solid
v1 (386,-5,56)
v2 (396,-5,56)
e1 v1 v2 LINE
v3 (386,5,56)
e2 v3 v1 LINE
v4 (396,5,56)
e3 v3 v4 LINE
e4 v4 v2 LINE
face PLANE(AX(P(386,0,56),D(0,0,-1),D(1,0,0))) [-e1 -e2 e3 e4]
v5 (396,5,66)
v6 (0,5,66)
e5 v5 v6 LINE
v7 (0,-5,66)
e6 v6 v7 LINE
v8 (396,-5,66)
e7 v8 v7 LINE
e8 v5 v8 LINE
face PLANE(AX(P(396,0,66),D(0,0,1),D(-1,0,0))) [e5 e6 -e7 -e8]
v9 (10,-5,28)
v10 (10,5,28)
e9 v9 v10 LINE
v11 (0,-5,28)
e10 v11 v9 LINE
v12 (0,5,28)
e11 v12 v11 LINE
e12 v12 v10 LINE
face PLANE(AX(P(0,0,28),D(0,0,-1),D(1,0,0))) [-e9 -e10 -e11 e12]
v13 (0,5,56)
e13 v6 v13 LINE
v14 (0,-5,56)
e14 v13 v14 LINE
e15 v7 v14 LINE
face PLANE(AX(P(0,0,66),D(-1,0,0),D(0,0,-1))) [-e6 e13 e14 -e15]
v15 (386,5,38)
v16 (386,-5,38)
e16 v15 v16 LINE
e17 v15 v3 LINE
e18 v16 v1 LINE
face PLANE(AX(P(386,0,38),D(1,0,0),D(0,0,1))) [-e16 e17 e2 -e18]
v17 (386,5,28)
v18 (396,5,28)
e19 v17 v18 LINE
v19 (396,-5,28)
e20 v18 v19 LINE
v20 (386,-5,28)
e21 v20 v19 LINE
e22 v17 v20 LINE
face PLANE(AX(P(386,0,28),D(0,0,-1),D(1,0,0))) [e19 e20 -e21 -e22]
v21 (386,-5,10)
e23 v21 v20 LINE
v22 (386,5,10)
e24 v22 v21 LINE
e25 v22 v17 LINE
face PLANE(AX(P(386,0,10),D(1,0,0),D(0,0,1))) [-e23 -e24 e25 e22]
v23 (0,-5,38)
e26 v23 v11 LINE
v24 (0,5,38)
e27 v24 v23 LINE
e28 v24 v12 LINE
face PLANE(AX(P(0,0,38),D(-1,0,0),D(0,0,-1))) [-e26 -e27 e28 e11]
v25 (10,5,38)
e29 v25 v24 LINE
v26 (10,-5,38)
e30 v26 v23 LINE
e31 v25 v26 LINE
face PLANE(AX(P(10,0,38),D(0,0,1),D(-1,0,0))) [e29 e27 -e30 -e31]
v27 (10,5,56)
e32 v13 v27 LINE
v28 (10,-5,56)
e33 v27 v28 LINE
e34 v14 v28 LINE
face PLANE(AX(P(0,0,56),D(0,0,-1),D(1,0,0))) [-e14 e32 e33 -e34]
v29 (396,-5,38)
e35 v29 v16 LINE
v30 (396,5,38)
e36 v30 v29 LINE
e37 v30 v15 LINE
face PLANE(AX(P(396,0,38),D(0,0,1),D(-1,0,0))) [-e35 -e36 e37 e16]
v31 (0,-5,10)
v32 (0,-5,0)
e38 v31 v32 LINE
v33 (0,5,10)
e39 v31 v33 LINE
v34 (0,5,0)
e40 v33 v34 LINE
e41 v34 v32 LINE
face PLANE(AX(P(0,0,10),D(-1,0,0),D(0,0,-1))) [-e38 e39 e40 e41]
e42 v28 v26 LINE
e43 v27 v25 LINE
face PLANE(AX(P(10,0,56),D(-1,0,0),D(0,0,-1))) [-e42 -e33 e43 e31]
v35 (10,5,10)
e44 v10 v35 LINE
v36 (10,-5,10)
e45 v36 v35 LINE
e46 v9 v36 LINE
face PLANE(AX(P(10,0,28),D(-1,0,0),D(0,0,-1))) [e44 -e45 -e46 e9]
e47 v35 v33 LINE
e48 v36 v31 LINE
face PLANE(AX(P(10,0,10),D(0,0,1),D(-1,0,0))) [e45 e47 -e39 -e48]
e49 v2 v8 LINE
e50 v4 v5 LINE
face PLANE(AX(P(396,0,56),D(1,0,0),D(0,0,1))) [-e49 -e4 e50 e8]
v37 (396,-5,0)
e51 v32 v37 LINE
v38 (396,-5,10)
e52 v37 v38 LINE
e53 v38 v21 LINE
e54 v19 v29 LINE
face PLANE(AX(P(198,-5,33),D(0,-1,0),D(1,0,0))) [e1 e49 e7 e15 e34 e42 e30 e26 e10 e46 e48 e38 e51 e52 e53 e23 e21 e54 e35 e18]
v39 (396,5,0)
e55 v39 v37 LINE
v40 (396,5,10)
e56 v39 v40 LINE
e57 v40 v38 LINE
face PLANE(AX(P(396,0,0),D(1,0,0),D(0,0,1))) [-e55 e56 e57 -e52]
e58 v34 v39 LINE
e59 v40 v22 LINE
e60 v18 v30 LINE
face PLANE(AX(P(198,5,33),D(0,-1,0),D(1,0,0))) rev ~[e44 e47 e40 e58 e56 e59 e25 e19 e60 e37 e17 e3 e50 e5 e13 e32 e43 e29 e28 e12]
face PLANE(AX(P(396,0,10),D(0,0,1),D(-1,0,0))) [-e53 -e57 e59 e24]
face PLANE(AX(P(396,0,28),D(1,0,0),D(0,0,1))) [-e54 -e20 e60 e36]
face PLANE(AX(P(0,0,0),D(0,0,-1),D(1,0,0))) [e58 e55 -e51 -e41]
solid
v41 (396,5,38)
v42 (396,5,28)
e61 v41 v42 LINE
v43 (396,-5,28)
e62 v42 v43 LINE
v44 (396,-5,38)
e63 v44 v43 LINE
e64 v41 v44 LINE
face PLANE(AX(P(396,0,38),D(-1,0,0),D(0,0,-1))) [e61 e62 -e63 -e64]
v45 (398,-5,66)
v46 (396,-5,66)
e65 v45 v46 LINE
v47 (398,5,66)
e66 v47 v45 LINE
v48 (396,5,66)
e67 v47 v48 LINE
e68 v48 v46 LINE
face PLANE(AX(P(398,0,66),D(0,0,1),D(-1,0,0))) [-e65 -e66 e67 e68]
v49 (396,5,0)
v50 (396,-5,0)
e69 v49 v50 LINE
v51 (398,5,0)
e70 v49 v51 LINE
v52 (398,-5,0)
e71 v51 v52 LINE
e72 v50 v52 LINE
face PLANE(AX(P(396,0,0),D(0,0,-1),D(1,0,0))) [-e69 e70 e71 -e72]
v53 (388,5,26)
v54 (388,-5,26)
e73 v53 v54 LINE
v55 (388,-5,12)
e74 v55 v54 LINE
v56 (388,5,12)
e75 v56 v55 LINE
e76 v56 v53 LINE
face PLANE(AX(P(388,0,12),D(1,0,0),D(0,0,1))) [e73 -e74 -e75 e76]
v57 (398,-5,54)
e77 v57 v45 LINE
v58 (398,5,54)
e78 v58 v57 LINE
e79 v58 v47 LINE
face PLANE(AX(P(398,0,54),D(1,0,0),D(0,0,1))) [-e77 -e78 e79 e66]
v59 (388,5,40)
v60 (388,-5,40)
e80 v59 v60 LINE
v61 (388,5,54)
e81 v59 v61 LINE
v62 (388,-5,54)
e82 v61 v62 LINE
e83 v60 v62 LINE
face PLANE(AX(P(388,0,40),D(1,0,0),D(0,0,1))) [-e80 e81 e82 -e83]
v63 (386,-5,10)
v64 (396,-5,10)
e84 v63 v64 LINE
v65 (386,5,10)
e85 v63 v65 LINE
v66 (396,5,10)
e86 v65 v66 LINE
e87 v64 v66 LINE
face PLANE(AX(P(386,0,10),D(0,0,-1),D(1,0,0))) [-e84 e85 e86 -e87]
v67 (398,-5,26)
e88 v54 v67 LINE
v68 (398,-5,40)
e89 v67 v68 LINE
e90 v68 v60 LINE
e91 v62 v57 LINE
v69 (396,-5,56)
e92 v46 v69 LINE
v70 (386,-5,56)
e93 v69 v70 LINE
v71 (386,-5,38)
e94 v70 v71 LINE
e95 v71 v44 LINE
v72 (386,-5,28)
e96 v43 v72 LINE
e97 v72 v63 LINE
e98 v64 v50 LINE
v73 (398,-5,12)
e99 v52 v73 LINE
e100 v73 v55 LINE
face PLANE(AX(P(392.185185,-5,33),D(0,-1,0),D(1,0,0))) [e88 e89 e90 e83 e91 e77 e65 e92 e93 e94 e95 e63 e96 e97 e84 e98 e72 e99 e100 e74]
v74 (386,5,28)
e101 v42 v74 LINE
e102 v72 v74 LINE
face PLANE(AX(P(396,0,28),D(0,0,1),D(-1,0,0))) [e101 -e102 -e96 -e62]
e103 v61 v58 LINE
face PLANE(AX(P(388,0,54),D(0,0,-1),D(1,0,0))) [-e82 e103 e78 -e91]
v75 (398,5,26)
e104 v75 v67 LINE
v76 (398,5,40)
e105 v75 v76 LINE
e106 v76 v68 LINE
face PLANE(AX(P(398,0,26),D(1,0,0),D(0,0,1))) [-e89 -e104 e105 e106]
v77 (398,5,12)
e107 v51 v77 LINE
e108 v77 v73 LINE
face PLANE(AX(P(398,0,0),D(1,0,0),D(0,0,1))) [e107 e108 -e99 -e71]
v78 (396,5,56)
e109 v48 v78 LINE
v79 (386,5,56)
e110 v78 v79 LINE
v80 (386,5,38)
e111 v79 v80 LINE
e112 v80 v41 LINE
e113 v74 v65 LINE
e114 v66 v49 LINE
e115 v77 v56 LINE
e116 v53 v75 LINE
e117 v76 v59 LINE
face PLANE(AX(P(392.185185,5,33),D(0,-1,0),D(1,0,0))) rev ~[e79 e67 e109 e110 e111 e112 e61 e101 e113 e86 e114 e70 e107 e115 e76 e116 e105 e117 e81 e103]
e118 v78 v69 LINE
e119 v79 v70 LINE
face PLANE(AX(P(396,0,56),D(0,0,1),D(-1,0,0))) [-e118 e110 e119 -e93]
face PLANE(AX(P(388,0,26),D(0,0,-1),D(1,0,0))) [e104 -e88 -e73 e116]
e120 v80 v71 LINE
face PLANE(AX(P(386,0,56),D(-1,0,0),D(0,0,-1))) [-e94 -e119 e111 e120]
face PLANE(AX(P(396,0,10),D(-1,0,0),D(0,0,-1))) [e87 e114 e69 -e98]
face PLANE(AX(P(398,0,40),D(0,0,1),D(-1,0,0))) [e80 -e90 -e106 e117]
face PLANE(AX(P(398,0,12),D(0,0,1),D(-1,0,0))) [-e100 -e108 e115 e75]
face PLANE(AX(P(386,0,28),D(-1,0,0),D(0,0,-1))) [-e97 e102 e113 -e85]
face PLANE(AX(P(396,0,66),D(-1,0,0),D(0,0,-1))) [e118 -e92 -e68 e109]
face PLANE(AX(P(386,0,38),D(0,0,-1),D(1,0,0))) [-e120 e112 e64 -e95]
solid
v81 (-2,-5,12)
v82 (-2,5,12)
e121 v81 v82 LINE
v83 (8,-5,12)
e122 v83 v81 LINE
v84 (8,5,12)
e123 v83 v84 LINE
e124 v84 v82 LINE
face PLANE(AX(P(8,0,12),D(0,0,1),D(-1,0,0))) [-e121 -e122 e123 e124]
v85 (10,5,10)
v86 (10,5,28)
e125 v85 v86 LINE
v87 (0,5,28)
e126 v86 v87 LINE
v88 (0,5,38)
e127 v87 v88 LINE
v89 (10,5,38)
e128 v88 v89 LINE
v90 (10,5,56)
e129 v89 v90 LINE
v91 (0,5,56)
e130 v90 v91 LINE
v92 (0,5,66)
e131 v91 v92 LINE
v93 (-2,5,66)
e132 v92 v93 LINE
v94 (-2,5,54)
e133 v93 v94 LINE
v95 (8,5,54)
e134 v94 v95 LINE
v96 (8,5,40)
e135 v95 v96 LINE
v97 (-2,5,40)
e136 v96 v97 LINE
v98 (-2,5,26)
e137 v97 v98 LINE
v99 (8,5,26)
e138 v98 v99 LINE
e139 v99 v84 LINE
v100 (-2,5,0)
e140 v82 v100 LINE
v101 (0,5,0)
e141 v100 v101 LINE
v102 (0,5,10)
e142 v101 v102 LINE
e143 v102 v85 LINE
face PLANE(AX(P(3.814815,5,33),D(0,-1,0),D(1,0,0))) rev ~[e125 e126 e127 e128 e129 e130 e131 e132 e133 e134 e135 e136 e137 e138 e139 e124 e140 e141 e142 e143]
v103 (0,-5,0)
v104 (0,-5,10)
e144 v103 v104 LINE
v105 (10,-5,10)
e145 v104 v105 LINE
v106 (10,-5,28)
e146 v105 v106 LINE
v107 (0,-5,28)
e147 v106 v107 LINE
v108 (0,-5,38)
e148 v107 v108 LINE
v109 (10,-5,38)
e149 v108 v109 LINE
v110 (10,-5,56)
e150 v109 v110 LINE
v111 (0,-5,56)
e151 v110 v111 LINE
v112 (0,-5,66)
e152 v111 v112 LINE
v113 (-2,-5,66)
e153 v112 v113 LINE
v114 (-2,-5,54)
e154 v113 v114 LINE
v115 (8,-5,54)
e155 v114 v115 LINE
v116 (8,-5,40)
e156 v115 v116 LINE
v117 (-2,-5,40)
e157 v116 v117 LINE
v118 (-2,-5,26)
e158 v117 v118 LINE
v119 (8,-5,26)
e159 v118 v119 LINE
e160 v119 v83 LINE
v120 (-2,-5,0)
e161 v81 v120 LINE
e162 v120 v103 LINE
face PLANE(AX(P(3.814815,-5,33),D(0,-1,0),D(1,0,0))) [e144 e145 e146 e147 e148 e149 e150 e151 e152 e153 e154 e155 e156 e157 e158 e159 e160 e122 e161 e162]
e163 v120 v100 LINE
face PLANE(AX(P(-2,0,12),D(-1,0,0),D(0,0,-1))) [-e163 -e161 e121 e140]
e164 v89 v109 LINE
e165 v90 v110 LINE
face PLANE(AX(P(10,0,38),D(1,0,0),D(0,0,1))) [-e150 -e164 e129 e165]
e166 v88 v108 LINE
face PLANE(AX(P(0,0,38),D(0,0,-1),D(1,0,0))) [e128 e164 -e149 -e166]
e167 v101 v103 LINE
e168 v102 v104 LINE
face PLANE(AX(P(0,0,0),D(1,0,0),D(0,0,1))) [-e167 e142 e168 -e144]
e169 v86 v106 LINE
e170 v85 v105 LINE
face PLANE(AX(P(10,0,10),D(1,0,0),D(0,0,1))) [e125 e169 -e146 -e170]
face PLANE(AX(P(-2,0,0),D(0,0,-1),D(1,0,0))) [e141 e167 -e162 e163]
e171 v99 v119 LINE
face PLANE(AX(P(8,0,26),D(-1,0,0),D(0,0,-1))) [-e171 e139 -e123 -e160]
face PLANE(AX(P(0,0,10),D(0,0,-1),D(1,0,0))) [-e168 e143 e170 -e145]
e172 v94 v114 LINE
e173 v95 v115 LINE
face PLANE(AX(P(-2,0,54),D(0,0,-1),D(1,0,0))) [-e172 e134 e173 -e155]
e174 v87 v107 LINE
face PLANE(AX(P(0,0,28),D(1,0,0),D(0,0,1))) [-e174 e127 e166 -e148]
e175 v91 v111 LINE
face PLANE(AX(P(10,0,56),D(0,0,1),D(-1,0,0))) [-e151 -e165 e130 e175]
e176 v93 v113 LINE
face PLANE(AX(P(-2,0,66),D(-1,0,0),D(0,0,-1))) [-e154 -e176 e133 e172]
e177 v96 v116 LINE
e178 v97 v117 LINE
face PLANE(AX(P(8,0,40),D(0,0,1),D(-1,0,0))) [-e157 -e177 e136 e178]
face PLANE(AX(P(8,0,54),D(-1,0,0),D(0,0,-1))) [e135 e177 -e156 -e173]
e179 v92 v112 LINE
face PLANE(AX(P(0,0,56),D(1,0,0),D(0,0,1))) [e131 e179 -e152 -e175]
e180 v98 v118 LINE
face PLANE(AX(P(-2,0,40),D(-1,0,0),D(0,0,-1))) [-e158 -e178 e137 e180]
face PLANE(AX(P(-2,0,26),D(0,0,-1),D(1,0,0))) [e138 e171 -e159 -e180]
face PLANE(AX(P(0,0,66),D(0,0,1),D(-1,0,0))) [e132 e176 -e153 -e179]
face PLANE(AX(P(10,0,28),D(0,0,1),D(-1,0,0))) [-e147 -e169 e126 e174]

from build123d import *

# Parameters (mm, degrees)
F2_DEPTH = 5
F3_DEPTH = 5


with BuildPart() as f2:
    # F1 (on Front) → F2 (new body, symmetric)
    with BuildSketch(Plane.XZ):
        Polygon((0, 10), (0, 0), (198, 0), (396, 0), (396, 10), (386, 10), (386, 28), (396, 28), (396, 38), (386, 38), (386, 56), (396, 56), (396, 66), (198, 66), (0, 66), (0, 56), (10, 56), (10, 38), (0, 38), (0, 28), (10, 28), (10, 10), align=None)
    extrude(amount=F2_DEPTH, both=True)


with BuildPart() as f3:
    # F1 (on Front) → F3 (new body, symmetric)
    with BuildSketch(Plane.XZ):
        Polygon((-2, 0), (0, 0), (0, 10), (10, 10), (10, 28), (0, 28), (0, 38), (10, 38), (10, 56), (0, 56), (0, 66), (-2, 66), (-2, 54), (8, 54), (8, 40), (-2, 40), (-2, 26), (8, 26), (8, 12), (-2, 12), align=None)
    extrude(amount=F3_DEPTH, both=True)


with BuildPart() as f3b:
    # F1 (on Front) → F3, piece 2 (new body, symmetric)
    with BuildSketch(Plane.XZ):
        Polygon((396, 10), (396, 0), (398, 0), (398, 12), (388, 12), (388, 26), (398, 26), (398, 40), (388, 40), (388, 54), (398, 54), (398, 66), (396, 66), (396, 56), (386, 56), (386, 38), (396, 38), (396, 28), (386, 28), (386, 10), align=None)
    extrude(amount=F3_DEPTH, both=True)


solid = Compound([f2.part, f3.part, f3b.part])
